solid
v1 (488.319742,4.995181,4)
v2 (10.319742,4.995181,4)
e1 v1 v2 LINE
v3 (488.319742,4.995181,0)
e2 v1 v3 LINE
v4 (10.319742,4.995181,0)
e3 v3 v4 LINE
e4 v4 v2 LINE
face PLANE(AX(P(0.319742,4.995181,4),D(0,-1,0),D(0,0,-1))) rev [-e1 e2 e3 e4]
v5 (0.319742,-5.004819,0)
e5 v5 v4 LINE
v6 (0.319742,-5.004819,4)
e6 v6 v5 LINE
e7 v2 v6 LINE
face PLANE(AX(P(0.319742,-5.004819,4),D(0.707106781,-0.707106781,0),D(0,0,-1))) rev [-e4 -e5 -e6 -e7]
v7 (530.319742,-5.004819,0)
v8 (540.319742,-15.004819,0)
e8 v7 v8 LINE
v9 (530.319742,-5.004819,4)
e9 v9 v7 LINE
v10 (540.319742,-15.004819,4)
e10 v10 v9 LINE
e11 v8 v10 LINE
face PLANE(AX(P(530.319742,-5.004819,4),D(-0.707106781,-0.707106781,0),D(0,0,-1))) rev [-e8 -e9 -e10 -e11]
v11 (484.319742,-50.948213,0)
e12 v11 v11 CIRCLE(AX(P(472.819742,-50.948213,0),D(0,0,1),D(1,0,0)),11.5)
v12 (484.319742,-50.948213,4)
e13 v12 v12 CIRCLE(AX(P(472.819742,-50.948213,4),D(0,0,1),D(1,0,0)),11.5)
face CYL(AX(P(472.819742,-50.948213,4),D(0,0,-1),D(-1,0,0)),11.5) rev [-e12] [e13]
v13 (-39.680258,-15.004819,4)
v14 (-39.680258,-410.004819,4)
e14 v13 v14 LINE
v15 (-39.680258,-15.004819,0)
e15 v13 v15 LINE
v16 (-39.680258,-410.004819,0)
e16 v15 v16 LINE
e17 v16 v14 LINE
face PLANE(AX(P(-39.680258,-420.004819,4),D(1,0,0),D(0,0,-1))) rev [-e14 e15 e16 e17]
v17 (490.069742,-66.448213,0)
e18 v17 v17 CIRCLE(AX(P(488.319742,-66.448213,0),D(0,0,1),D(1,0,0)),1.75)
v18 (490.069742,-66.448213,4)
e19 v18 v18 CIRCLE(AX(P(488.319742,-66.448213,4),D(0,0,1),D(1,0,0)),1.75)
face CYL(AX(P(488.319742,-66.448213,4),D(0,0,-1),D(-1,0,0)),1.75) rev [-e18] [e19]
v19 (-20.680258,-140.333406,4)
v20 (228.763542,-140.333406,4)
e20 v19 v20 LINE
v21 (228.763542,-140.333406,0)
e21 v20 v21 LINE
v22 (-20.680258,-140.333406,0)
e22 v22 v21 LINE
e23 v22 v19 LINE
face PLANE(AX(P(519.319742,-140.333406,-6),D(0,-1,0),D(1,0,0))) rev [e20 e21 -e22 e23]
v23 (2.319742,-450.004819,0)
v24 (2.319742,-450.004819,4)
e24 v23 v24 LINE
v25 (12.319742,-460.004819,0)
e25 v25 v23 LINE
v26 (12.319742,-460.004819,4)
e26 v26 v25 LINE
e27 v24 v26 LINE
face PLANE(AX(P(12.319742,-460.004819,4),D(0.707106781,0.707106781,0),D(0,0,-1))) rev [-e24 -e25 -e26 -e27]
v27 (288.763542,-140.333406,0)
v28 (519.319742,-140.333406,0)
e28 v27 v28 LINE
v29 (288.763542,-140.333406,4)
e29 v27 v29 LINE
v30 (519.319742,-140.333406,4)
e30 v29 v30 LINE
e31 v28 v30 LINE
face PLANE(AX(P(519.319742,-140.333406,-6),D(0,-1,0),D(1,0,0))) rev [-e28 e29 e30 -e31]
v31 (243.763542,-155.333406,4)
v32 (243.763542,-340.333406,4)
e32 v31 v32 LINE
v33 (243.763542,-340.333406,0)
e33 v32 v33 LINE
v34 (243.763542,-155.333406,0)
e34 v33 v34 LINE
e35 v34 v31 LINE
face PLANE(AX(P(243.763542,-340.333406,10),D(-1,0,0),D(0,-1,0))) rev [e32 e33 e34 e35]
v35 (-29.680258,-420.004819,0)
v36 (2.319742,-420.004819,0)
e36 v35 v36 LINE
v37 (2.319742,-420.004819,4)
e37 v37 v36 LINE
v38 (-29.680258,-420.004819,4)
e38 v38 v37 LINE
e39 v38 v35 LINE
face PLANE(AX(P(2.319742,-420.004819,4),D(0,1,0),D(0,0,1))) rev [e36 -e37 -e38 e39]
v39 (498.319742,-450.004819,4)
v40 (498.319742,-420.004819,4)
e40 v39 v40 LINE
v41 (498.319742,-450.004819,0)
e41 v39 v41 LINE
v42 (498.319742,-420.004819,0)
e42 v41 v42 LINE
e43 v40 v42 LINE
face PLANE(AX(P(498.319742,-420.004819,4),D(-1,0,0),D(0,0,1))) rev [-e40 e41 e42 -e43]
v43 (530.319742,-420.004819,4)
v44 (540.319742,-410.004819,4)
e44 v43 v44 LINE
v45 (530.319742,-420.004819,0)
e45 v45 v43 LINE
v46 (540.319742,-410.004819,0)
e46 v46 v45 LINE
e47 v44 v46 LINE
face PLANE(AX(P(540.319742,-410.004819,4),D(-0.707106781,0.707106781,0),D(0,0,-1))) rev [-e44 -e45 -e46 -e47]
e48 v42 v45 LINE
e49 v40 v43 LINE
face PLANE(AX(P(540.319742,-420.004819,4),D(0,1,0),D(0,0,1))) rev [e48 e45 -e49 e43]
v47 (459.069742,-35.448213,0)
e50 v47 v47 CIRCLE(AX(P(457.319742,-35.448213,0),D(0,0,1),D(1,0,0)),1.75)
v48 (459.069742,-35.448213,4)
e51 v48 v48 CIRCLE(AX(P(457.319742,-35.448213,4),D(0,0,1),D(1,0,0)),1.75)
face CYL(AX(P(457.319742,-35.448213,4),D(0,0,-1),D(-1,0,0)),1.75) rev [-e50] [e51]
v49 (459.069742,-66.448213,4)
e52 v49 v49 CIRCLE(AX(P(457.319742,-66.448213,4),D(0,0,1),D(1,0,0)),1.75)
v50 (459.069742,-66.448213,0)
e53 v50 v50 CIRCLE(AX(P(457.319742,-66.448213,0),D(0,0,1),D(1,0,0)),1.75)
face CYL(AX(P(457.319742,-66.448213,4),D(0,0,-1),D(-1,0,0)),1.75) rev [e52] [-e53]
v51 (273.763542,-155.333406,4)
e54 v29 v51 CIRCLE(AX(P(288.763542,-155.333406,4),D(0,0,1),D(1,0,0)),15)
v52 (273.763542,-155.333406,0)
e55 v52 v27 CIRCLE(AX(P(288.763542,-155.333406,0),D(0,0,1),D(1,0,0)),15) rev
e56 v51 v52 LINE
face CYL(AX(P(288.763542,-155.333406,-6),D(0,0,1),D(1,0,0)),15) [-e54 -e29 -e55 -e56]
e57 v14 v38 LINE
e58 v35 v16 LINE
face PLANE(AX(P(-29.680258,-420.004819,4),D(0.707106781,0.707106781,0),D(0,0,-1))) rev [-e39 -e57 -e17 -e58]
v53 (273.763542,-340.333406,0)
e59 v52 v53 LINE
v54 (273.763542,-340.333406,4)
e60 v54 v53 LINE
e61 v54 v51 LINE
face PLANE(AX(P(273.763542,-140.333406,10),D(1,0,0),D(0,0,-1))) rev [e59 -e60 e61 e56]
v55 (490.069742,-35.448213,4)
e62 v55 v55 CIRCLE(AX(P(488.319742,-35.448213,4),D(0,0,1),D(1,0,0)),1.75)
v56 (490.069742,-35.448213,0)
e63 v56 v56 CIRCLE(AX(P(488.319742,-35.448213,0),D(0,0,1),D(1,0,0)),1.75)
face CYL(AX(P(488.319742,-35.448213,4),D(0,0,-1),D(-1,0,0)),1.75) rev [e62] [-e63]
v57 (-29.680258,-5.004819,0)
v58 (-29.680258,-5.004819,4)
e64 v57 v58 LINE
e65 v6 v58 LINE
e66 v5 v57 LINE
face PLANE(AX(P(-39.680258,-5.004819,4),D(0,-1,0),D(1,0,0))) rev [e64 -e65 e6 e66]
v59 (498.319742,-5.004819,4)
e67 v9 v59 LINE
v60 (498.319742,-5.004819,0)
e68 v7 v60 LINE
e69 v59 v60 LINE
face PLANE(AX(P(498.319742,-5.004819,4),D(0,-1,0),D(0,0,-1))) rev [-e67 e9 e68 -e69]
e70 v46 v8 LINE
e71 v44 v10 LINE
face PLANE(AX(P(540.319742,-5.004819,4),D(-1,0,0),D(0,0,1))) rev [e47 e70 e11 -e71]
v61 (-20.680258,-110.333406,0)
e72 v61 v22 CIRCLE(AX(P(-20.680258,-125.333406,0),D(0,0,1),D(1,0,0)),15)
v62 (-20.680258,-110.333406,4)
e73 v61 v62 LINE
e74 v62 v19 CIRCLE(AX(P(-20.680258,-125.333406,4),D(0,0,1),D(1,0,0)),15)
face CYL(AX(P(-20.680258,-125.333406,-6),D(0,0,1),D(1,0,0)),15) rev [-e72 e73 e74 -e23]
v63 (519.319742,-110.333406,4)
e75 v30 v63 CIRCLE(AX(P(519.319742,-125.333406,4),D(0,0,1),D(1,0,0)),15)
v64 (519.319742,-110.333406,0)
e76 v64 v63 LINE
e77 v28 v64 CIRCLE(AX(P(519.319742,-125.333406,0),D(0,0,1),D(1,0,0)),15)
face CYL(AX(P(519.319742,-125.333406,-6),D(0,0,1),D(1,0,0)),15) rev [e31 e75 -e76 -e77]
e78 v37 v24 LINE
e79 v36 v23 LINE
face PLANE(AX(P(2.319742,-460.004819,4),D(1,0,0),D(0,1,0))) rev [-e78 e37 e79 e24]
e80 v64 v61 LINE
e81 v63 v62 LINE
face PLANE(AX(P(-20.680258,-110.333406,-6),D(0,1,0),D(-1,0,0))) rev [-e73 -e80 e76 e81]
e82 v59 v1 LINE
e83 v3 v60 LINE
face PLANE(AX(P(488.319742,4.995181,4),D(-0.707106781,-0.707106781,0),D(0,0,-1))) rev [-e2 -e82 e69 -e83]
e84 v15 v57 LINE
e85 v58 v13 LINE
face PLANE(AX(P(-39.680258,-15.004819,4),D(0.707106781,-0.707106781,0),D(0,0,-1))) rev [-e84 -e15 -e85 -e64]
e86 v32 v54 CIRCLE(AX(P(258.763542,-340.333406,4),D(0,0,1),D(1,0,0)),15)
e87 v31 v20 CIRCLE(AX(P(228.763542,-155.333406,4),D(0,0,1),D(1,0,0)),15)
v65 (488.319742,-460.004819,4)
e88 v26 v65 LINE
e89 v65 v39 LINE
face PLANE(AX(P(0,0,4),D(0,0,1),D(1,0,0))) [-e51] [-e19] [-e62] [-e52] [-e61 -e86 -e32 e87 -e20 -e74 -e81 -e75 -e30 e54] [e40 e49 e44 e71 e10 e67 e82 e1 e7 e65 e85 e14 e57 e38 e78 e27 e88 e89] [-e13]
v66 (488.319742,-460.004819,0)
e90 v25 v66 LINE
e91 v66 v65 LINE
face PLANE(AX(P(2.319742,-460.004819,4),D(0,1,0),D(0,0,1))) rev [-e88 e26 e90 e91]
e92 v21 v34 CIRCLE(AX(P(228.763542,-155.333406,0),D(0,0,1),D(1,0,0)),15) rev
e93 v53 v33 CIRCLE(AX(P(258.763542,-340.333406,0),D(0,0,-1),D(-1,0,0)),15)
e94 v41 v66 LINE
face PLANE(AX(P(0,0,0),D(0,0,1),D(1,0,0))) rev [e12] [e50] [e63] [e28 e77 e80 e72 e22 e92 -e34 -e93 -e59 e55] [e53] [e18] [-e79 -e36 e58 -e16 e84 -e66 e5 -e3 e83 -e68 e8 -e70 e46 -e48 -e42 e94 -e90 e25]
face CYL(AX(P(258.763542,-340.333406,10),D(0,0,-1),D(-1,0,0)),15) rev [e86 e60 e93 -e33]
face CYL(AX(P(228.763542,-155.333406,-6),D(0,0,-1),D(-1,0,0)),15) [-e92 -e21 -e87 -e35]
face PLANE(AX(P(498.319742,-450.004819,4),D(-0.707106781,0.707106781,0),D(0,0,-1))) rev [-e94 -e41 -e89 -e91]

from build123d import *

# Parameters (mm, degrees)
SKETCH1_R           = 1.75
SKETCH1_R_2         = 11.5
BOSS_EXTRUDE1_DEPTH = 4
CHAMFER1_SIZE       = 10
CHAMFER2_SIZE       = 10
CUT_EXTRUDE1_DEPTH  = 10
CUT_EXTRUDE2_DEPTH  = 10
FILLET1_R           = 15


with BuildPart() as part:
    # Sketch1 → Boss-Extrude1 (new body)
    with BuildSketch(Plane.XY):
        Polygon((-39.680258263, -5.004819249), (0.319741737, -5.004819249), (0.319741737, 4.995180751), (498.319741737, 4.995180751), (498.319741737, -5.004819249), (540.319741737, -5.004819249), (540.319741737, -420.004819249), (498.319741737, -420.004819249), (498.319741737, -460.004819249), (2.319741737, -460.004819249), (2.319741737, -420.004819249), (-39.680258263, -420.004819249), align=None)
        with Locations((457.319741737, -35.448212978)):
            Circle(SKETCH1_R, mode=Mode.SUBTRACT)
        with Locations((457.319741737, -66.448212978)):
            Circle(SKETCH1_R, mode=Mode.SUBTRACT)
        with Locations((488.319741737, -66.448212978)):
            Circle(SKETCH1_R, mode=Mode.SUBTRACT)
        with Locations((488.319741737, -35.448212978)):
            Circle(SKETCH1_R, mode=Mode.SUBTRACT)
        with Locations((472.819741737, -50.948212978)):
            Circle(SKETCH1_R_2, mode=Mode.SUBTRACT)
    extrude(amount=BOSS_EXTRUDE1_DEPTH)

    # Chamfer1
    chamfer1_edges = [part.edges().sort_by_distance(p)[0] for p in [
        (498.319741737, 4.995180751, 2),
        (0.319741737, 4.995180751, 2),
    ]]
    chamfer(chamfer1_edges, length=CHAMFER1_SIZE - 0.0001)  # a hair under: the kernel refuses the full size

    # Chamfer2
    chamfer2_edges = [part.edges().sort_by_distance(p)[0] for p in [
        (540.319741737, -5.004819249, 2),
        (540.319741737, -420.004819249, 2),
        (498.319741737, -460.004819249, 2),
        (2.319741737, -460.004819249, 2),
        (-39.680258263, -420.004819249, 2),
        (-39.680258263, -5.004819249, 2),
    ]]
    chamfer(chamfer2_edges, length=CHAMFER2_SIZE)

    # Sketch2 → Cut-Extrude1 (cut)
    with BuildSketch(Plane.XY.offset(4)):
        with BuildLine():
            Line((-20.680258263, -110.333406017), (519.319741737, -110.333406017))
            ThreePointArc((519.319741737, -110.333406017), (534.319741737, -125.333406017), (519.319741737, -140.333406017))
            Line((519.319741737, -140.333406017), (-20.680258263, -140.333406017))
            ThreePointArc((-20.680258263, -140.333406017), (-35.680258263, -125.333406017), (-20.680258263, -110.333406017))
        make_face()
    extrude(amount=-CUT_EXTRUDE1_DEPTH, mode=Mode.SUBTRACT)

    # Sketch3 → Cut-Extrude2 (cut)
    with BuildSketch(Plane(origin=(0, 0, 0), x_dir=(-1, 0, 0), z_dir=(0, 0, -1))):
        with BuildLine():
            Line((-273.763542149, -140.333406017), (-273.763542149, -340.333406017))
            ThreePointArc((-273.763542149, -340.333406017), (-258.763542149, -355.333406017), (-243.763542149, -340.333406017))
            Line((-243.763542149, -340.333406017), (-243.763542149, -140.333406017))
            Line((-243.763542149, -140.333406017), (-273.763542149, -140.333406017))
        make_face()
    extrude(amount=-CUT_EXTRUDE2_DEPTH, mode=Mode.SUBTRACT)

    # Fillet1
    fillet1_edges = [part.edges().sort_by_distance(p)[0] for p in [
        (273.763542149, -140.333406017, 2),
        (243.763542149, -140.333406017, 2),
    ]]
    fillet(fillet1_edges, radius=FILLET1_R)


solid = part.part
